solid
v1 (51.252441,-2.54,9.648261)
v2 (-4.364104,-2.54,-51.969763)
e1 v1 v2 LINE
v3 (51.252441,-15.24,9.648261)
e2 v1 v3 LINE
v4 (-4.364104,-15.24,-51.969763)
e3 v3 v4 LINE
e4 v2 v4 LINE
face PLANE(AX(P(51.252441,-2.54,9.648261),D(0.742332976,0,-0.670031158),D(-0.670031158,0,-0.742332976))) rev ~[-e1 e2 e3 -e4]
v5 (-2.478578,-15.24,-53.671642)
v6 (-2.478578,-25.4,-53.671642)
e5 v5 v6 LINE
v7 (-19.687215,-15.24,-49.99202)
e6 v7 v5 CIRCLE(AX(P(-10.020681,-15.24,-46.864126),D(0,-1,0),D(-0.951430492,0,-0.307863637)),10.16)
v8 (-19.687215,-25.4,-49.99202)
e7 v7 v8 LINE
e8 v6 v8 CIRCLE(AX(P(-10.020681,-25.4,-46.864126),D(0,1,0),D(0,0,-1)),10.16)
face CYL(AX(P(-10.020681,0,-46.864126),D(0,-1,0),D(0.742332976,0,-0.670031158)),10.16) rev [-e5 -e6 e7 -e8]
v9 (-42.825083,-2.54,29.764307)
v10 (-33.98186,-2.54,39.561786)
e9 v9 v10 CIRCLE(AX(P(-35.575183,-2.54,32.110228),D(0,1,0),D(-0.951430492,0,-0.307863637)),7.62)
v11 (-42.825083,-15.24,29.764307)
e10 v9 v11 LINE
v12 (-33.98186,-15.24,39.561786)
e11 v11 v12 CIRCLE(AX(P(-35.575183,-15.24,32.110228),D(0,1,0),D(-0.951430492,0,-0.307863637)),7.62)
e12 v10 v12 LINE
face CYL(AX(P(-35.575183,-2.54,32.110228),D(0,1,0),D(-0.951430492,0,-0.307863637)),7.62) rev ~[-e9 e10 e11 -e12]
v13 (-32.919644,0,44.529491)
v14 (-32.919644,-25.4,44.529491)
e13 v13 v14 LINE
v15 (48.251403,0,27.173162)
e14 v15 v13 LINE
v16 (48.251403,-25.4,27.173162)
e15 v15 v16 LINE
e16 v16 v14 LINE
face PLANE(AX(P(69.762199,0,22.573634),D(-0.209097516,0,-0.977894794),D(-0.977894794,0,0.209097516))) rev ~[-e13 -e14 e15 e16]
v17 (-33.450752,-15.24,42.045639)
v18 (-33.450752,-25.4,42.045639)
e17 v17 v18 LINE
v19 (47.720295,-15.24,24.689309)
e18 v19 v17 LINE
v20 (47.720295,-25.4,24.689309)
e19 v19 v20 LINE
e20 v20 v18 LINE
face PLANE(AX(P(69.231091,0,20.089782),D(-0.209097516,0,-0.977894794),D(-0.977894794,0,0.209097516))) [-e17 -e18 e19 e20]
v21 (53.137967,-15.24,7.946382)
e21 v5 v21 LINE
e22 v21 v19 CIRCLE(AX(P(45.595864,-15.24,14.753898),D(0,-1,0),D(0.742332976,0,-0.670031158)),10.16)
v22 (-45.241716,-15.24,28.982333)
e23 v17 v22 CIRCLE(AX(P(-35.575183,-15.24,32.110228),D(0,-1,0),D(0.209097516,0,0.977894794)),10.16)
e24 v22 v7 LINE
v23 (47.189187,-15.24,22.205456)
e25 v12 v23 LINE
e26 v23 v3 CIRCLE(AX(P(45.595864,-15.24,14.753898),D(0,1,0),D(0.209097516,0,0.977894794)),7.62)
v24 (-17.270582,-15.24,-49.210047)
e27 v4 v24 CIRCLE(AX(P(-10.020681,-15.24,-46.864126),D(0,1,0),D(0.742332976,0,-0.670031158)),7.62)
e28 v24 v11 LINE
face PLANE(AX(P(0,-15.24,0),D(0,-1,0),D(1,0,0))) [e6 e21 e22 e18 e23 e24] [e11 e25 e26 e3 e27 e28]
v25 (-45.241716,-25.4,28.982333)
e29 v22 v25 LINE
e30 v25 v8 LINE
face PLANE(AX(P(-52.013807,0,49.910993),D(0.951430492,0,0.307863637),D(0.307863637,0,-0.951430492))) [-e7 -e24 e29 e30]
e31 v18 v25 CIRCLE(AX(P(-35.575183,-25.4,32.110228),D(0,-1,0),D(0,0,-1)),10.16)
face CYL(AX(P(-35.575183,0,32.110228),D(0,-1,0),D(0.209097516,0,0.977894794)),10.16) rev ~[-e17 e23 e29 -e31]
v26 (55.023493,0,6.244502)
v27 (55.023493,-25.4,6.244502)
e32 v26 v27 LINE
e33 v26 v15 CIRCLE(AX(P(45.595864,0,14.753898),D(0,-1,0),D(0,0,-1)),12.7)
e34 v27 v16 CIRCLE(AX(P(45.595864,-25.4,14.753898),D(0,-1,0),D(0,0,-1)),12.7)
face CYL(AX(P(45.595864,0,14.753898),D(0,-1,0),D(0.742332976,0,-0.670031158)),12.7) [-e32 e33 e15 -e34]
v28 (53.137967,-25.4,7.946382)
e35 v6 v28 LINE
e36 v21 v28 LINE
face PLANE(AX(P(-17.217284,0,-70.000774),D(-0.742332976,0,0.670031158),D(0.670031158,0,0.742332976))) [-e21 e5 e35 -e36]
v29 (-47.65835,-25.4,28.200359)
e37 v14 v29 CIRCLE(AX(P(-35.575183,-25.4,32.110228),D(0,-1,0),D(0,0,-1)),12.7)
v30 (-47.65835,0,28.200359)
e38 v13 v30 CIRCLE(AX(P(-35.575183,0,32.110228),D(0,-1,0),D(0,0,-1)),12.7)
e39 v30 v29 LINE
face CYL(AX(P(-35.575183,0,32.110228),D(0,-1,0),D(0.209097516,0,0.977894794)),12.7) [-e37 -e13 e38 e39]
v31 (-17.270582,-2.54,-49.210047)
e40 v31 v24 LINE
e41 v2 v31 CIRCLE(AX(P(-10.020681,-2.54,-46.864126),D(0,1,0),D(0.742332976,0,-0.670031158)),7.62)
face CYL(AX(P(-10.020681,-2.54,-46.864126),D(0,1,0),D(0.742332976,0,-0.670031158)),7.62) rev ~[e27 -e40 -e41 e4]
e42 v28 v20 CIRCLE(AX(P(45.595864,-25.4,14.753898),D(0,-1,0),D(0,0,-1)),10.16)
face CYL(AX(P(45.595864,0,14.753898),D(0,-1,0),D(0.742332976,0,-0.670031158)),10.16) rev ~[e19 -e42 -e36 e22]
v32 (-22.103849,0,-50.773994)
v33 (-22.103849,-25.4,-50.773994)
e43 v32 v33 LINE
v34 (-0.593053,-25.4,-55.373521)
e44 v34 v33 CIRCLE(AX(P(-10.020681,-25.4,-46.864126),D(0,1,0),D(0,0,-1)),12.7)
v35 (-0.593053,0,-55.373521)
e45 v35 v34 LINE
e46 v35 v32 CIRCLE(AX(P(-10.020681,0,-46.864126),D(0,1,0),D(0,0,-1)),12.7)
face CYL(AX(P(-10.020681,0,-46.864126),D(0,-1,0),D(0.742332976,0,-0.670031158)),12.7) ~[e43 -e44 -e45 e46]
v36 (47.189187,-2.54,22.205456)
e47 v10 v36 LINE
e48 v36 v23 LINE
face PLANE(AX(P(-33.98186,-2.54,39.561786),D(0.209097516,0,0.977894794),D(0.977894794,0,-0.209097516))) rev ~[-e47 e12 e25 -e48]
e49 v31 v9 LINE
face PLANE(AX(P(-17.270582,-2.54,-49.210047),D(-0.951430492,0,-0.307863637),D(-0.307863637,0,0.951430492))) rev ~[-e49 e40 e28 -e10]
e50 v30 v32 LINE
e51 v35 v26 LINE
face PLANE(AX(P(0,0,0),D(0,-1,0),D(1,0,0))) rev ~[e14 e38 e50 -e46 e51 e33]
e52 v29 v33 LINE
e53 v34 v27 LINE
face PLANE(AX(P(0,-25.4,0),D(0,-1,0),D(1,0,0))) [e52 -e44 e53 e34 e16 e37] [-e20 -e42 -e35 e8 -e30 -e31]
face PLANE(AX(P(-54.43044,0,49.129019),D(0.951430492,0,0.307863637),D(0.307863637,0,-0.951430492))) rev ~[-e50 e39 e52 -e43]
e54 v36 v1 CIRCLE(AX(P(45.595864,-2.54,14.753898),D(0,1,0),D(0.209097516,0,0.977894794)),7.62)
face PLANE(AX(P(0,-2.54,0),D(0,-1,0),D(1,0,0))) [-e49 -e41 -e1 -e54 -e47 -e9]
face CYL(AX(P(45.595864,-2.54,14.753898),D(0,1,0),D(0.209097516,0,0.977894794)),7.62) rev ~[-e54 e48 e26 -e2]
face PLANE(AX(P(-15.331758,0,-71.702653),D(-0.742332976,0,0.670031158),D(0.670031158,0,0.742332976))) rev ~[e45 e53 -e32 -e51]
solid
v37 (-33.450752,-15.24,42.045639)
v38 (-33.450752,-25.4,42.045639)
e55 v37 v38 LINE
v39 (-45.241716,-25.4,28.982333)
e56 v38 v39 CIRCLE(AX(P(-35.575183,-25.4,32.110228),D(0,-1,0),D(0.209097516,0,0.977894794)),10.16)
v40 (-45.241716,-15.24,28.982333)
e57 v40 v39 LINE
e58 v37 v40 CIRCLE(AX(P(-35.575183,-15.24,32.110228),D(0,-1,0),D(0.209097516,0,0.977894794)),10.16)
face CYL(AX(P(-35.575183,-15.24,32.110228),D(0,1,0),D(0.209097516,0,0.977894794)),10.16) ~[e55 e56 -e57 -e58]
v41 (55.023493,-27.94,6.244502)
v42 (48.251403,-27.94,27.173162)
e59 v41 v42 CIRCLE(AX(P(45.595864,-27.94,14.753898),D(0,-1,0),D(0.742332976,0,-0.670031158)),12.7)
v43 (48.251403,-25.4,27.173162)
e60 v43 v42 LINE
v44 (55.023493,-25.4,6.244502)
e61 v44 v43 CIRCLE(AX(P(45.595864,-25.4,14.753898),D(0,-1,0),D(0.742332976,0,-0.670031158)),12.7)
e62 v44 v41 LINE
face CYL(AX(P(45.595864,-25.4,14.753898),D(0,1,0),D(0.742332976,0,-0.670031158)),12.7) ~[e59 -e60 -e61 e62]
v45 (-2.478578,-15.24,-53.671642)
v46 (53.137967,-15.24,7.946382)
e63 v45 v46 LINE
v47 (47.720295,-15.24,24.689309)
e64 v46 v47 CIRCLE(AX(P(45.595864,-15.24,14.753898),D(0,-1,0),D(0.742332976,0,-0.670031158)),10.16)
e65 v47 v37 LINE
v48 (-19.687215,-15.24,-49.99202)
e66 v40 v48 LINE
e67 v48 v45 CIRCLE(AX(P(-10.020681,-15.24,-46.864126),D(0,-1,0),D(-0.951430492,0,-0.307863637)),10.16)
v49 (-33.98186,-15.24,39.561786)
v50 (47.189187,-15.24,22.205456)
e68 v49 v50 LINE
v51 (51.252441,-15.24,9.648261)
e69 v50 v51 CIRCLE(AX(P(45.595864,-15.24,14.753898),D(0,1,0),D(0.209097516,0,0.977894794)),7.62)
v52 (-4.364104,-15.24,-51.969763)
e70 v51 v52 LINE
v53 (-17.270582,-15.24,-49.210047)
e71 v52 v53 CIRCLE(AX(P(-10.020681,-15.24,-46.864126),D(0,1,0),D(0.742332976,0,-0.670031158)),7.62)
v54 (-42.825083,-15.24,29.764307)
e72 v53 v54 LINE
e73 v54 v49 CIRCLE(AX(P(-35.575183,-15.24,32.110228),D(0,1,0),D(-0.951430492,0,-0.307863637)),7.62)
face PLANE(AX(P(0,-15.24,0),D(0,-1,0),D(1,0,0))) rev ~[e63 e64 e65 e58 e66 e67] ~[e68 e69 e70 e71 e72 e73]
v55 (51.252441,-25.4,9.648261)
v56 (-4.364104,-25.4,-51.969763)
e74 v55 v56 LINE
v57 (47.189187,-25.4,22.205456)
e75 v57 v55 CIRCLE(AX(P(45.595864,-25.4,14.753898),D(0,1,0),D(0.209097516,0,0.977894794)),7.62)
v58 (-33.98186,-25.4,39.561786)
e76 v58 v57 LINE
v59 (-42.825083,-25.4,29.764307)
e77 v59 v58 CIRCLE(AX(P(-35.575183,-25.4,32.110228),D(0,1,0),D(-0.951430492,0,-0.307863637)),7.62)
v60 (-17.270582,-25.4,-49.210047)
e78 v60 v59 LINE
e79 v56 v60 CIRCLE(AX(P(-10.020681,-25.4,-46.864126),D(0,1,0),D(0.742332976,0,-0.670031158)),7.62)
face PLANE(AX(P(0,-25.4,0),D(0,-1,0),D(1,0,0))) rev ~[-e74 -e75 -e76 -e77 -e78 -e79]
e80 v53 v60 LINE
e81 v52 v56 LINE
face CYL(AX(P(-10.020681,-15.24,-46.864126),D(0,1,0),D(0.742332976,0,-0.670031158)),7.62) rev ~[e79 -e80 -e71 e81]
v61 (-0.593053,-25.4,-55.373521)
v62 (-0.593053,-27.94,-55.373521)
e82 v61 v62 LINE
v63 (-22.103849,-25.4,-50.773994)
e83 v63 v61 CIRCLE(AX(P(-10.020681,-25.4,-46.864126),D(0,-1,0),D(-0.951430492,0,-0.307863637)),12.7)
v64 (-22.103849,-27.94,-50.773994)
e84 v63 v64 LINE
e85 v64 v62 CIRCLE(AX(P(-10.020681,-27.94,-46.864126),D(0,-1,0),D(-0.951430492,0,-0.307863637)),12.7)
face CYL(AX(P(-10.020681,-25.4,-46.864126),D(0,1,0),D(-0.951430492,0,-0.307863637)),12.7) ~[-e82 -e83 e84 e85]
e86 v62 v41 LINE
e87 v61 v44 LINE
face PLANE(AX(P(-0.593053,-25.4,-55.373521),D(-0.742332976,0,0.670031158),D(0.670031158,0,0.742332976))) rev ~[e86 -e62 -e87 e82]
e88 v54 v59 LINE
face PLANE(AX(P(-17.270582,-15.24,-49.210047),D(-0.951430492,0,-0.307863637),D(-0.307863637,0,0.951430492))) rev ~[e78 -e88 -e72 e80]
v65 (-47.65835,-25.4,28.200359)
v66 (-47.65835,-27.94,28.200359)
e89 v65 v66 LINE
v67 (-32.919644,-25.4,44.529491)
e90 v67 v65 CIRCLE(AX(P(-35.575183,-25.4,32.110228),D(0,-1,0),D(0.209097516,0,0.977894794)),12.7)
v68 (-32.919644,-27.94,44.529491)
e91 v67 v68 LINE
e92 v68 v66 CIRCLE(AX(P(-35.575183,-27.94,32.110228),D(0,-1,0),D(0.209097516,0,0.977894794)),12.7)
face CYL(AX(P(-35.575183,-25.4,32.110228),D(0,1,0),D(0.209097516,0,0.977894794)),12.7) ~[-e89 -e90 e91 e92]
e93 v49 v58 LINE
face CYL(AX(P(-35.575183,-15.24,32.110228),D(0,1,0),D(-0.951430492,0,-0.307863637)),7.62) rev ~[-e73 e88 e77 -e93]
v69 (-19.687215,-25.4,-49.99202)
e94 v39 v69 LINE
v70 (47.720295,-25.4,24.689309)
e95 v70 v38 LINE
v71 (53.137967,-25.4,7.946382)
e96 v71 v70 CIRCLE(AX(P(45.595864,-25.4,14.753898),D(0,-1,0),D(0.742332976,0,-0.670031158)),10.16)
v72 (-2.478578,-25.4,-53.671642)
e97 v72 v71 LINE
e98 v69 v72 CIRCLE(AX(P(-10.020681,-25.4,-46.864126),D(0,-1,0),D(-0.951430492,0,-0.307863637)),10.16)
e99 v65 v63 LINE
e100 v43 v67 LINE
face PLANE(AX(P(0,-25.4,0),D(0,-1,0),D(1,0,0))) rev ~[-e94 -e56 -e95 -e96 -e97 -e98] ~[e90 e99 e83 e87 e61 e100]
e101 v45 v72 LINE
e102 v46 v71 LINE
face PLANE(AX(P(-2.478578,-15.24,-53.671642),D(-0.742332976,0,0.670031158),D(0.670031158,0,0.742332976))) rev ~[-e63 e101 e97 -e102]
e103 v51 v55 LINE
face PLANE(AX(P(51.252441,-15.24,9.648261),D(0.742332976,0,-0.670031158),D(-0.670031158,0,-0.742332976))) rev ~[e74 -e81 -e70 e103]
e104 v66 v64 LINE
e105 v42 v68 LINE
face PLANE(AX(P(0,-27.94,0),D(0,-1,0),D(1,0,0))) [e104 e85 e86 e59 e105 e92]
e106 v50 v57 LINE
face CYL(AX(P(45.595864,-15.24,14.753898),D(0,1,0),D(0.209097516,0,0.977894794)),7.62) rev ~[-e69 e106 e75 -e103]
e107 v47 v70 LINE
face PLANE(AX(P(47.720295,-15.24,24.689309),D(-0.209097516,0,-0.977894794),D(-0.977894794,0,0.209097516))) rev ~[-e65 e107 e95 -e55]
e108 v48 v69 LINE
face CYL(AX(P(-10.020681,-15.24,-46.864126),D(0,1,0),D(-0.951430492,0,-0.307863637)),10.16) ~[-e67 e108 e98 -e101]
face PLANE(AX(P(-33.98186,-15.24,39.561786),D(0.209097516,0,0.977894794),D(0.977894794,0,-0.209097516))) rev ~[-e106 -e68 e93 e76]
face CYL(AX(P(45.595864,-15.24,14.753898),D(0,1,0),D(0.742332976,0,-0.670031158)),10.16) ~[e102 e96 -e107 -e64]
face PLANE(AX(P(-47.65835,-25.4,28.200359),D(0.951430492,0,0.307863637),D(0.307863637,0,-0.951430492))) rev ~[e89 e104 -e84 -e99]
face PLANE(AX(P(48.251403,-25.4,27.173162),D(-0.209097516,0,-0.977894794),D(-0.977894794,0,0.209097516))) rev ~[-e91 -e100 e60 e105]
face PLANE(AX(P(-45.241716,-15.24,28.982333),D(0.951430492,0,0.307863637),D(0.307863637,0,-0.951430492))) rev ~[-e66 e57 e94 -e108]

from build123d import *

# Parameters (mm, degrees)
F0_DEPTH = 25.4
F1_R     = 12.7
F2_T     = -2.54
F4_DEPTH = 12.7
F7_DEPTH = 10.16
F9_DEPTH = 2.54


# Not quite as in the source:
# - a feature of the source that left no trace in its solid (it failed there, or was rolled back) is left out


with BuildPart() as f0:
    # F6 (on Front) → F0 (new body)
    with BuildSketch(Plane.XZ):
        Polygon((-15.3317583938, -71.7026534927), (69.7621986403, 22.5736344926), (-54.4304402465, 49.129019), align=None)
    extrude(amount=F0_DEPTH)

    # F1
    f1_edges = [f0.edges().sort_by_distance(p)[0] for p in [
        (69.762199, -12.7, 22.573634),
        (-15.331758, -12.7, -71.702653),
        (-54.43044, -12.7, 49.129019),
    ]]
    fillet(f1_edges, radius=F1_R)

    # F2
    f2_openings = [f0.faces().sort_by_distance(p)[0] for p in [
        (0, -25.4, 0),
    ]]
    offset(amount=F2_T, openings=f2_openings)

    # F3 (on face) → F4 (join)
    with BuildSketch(Plane.XZ.offset(2.54)):
        with BuildLine():
            ThreePointArc((-19.6872152917, -49.9920202635), (-12.1451122529, -56.7995368262), (-2.4785784535, -53.671642278))
            Line((-2.4785784535, -53.671642278), (53.1379671806, 7.9463815593))
            ThreePointArc((53.1379671806, 7.9463815593), (55.2623979412, 17.8817926703), (47.7202949023, 24.689309233))
            Line((47.7202949023, 24.689309233), (-33.4507518888, 42.0456387041))
            ThreePointArc((-33.4507518888, 42.0456387041), (-43.1172856883, 38.9177441559), (-45.2417164489, 28.982333045))
            Line((-45.2417164489, 28.982333045), (-19.6872152917, -49.9920202635))
        make_face()
        with BuildLine():
            Line((-17.2705818419, -49.2100466265), (-42.825082999, 29.7643066821))
            ThreePointArc((-42.825082999, 29.7643066821), (-41.2317599286, 37.2158650153), (-33.981859579, 39.5617859264))
            Line((-33.981859579, 39.5617859264), (47.1891872122, 22.2054564553))
            ThreePointArc((47.1891872122, 22.2054564553), (52.8457644913, 17.0998190332), (51.2524414209, 9.6482607))
            Line((51.2524414209, 9.6482607), (-4.3641042132, -51.9697631373))
            ThreePointArc((-4.3641042132, -51.9697631373), (-11.6140045628, -54.3156840485), (-17.2705818419, -49.2100466265))
        make_face(mode=Mode.SUBTRACT)
    extrude(amount=F4_DEPTH)


with BuildPart() as f7:
    # F7 (new): a face of the model
    f7_faces = [f0.part.faces().sort_by_distance(p)[0] for p in [
        (-11.8482246963, -15.24, -55.4110708034),
    ]]
    extrude(f7_faces, amount=F7_DEPTH)

    # F8 (on face) → F9 (join)
    with BuildSketch(Plane.XZ.offset(25.4)):
        with BuildLine():
            ThreePointArc((55.0234929403, 6.2445024187), (57.679031391, 18.6637663073), (48.2514025925, 27.1731620108))
            Line((48.2514025925, 27.1731620108), (-32.9196441987, 44.5294914819))
            ThreePointArc((-32.9196441987, 44.5294914819), (-45.002811448, 40.6196232966), (-47.6583498987, 28.200359408))
            Line((-47.6583498987, 28.200359408), (-22.1038487416, -50.7739939006))
            ThreePointArc((-22.1038487416, -50.7739939006), (-12.6762199431, -59.283389604), (-0.5930526938, -55.3735214187))
            Line((-0.5930526938, -55.3735214187), (55.0234929403, 6.2445024187))
        make_face()
    extrude(amount=F9_DEPTH)


solid = Compound([f0.part, f7.part])
